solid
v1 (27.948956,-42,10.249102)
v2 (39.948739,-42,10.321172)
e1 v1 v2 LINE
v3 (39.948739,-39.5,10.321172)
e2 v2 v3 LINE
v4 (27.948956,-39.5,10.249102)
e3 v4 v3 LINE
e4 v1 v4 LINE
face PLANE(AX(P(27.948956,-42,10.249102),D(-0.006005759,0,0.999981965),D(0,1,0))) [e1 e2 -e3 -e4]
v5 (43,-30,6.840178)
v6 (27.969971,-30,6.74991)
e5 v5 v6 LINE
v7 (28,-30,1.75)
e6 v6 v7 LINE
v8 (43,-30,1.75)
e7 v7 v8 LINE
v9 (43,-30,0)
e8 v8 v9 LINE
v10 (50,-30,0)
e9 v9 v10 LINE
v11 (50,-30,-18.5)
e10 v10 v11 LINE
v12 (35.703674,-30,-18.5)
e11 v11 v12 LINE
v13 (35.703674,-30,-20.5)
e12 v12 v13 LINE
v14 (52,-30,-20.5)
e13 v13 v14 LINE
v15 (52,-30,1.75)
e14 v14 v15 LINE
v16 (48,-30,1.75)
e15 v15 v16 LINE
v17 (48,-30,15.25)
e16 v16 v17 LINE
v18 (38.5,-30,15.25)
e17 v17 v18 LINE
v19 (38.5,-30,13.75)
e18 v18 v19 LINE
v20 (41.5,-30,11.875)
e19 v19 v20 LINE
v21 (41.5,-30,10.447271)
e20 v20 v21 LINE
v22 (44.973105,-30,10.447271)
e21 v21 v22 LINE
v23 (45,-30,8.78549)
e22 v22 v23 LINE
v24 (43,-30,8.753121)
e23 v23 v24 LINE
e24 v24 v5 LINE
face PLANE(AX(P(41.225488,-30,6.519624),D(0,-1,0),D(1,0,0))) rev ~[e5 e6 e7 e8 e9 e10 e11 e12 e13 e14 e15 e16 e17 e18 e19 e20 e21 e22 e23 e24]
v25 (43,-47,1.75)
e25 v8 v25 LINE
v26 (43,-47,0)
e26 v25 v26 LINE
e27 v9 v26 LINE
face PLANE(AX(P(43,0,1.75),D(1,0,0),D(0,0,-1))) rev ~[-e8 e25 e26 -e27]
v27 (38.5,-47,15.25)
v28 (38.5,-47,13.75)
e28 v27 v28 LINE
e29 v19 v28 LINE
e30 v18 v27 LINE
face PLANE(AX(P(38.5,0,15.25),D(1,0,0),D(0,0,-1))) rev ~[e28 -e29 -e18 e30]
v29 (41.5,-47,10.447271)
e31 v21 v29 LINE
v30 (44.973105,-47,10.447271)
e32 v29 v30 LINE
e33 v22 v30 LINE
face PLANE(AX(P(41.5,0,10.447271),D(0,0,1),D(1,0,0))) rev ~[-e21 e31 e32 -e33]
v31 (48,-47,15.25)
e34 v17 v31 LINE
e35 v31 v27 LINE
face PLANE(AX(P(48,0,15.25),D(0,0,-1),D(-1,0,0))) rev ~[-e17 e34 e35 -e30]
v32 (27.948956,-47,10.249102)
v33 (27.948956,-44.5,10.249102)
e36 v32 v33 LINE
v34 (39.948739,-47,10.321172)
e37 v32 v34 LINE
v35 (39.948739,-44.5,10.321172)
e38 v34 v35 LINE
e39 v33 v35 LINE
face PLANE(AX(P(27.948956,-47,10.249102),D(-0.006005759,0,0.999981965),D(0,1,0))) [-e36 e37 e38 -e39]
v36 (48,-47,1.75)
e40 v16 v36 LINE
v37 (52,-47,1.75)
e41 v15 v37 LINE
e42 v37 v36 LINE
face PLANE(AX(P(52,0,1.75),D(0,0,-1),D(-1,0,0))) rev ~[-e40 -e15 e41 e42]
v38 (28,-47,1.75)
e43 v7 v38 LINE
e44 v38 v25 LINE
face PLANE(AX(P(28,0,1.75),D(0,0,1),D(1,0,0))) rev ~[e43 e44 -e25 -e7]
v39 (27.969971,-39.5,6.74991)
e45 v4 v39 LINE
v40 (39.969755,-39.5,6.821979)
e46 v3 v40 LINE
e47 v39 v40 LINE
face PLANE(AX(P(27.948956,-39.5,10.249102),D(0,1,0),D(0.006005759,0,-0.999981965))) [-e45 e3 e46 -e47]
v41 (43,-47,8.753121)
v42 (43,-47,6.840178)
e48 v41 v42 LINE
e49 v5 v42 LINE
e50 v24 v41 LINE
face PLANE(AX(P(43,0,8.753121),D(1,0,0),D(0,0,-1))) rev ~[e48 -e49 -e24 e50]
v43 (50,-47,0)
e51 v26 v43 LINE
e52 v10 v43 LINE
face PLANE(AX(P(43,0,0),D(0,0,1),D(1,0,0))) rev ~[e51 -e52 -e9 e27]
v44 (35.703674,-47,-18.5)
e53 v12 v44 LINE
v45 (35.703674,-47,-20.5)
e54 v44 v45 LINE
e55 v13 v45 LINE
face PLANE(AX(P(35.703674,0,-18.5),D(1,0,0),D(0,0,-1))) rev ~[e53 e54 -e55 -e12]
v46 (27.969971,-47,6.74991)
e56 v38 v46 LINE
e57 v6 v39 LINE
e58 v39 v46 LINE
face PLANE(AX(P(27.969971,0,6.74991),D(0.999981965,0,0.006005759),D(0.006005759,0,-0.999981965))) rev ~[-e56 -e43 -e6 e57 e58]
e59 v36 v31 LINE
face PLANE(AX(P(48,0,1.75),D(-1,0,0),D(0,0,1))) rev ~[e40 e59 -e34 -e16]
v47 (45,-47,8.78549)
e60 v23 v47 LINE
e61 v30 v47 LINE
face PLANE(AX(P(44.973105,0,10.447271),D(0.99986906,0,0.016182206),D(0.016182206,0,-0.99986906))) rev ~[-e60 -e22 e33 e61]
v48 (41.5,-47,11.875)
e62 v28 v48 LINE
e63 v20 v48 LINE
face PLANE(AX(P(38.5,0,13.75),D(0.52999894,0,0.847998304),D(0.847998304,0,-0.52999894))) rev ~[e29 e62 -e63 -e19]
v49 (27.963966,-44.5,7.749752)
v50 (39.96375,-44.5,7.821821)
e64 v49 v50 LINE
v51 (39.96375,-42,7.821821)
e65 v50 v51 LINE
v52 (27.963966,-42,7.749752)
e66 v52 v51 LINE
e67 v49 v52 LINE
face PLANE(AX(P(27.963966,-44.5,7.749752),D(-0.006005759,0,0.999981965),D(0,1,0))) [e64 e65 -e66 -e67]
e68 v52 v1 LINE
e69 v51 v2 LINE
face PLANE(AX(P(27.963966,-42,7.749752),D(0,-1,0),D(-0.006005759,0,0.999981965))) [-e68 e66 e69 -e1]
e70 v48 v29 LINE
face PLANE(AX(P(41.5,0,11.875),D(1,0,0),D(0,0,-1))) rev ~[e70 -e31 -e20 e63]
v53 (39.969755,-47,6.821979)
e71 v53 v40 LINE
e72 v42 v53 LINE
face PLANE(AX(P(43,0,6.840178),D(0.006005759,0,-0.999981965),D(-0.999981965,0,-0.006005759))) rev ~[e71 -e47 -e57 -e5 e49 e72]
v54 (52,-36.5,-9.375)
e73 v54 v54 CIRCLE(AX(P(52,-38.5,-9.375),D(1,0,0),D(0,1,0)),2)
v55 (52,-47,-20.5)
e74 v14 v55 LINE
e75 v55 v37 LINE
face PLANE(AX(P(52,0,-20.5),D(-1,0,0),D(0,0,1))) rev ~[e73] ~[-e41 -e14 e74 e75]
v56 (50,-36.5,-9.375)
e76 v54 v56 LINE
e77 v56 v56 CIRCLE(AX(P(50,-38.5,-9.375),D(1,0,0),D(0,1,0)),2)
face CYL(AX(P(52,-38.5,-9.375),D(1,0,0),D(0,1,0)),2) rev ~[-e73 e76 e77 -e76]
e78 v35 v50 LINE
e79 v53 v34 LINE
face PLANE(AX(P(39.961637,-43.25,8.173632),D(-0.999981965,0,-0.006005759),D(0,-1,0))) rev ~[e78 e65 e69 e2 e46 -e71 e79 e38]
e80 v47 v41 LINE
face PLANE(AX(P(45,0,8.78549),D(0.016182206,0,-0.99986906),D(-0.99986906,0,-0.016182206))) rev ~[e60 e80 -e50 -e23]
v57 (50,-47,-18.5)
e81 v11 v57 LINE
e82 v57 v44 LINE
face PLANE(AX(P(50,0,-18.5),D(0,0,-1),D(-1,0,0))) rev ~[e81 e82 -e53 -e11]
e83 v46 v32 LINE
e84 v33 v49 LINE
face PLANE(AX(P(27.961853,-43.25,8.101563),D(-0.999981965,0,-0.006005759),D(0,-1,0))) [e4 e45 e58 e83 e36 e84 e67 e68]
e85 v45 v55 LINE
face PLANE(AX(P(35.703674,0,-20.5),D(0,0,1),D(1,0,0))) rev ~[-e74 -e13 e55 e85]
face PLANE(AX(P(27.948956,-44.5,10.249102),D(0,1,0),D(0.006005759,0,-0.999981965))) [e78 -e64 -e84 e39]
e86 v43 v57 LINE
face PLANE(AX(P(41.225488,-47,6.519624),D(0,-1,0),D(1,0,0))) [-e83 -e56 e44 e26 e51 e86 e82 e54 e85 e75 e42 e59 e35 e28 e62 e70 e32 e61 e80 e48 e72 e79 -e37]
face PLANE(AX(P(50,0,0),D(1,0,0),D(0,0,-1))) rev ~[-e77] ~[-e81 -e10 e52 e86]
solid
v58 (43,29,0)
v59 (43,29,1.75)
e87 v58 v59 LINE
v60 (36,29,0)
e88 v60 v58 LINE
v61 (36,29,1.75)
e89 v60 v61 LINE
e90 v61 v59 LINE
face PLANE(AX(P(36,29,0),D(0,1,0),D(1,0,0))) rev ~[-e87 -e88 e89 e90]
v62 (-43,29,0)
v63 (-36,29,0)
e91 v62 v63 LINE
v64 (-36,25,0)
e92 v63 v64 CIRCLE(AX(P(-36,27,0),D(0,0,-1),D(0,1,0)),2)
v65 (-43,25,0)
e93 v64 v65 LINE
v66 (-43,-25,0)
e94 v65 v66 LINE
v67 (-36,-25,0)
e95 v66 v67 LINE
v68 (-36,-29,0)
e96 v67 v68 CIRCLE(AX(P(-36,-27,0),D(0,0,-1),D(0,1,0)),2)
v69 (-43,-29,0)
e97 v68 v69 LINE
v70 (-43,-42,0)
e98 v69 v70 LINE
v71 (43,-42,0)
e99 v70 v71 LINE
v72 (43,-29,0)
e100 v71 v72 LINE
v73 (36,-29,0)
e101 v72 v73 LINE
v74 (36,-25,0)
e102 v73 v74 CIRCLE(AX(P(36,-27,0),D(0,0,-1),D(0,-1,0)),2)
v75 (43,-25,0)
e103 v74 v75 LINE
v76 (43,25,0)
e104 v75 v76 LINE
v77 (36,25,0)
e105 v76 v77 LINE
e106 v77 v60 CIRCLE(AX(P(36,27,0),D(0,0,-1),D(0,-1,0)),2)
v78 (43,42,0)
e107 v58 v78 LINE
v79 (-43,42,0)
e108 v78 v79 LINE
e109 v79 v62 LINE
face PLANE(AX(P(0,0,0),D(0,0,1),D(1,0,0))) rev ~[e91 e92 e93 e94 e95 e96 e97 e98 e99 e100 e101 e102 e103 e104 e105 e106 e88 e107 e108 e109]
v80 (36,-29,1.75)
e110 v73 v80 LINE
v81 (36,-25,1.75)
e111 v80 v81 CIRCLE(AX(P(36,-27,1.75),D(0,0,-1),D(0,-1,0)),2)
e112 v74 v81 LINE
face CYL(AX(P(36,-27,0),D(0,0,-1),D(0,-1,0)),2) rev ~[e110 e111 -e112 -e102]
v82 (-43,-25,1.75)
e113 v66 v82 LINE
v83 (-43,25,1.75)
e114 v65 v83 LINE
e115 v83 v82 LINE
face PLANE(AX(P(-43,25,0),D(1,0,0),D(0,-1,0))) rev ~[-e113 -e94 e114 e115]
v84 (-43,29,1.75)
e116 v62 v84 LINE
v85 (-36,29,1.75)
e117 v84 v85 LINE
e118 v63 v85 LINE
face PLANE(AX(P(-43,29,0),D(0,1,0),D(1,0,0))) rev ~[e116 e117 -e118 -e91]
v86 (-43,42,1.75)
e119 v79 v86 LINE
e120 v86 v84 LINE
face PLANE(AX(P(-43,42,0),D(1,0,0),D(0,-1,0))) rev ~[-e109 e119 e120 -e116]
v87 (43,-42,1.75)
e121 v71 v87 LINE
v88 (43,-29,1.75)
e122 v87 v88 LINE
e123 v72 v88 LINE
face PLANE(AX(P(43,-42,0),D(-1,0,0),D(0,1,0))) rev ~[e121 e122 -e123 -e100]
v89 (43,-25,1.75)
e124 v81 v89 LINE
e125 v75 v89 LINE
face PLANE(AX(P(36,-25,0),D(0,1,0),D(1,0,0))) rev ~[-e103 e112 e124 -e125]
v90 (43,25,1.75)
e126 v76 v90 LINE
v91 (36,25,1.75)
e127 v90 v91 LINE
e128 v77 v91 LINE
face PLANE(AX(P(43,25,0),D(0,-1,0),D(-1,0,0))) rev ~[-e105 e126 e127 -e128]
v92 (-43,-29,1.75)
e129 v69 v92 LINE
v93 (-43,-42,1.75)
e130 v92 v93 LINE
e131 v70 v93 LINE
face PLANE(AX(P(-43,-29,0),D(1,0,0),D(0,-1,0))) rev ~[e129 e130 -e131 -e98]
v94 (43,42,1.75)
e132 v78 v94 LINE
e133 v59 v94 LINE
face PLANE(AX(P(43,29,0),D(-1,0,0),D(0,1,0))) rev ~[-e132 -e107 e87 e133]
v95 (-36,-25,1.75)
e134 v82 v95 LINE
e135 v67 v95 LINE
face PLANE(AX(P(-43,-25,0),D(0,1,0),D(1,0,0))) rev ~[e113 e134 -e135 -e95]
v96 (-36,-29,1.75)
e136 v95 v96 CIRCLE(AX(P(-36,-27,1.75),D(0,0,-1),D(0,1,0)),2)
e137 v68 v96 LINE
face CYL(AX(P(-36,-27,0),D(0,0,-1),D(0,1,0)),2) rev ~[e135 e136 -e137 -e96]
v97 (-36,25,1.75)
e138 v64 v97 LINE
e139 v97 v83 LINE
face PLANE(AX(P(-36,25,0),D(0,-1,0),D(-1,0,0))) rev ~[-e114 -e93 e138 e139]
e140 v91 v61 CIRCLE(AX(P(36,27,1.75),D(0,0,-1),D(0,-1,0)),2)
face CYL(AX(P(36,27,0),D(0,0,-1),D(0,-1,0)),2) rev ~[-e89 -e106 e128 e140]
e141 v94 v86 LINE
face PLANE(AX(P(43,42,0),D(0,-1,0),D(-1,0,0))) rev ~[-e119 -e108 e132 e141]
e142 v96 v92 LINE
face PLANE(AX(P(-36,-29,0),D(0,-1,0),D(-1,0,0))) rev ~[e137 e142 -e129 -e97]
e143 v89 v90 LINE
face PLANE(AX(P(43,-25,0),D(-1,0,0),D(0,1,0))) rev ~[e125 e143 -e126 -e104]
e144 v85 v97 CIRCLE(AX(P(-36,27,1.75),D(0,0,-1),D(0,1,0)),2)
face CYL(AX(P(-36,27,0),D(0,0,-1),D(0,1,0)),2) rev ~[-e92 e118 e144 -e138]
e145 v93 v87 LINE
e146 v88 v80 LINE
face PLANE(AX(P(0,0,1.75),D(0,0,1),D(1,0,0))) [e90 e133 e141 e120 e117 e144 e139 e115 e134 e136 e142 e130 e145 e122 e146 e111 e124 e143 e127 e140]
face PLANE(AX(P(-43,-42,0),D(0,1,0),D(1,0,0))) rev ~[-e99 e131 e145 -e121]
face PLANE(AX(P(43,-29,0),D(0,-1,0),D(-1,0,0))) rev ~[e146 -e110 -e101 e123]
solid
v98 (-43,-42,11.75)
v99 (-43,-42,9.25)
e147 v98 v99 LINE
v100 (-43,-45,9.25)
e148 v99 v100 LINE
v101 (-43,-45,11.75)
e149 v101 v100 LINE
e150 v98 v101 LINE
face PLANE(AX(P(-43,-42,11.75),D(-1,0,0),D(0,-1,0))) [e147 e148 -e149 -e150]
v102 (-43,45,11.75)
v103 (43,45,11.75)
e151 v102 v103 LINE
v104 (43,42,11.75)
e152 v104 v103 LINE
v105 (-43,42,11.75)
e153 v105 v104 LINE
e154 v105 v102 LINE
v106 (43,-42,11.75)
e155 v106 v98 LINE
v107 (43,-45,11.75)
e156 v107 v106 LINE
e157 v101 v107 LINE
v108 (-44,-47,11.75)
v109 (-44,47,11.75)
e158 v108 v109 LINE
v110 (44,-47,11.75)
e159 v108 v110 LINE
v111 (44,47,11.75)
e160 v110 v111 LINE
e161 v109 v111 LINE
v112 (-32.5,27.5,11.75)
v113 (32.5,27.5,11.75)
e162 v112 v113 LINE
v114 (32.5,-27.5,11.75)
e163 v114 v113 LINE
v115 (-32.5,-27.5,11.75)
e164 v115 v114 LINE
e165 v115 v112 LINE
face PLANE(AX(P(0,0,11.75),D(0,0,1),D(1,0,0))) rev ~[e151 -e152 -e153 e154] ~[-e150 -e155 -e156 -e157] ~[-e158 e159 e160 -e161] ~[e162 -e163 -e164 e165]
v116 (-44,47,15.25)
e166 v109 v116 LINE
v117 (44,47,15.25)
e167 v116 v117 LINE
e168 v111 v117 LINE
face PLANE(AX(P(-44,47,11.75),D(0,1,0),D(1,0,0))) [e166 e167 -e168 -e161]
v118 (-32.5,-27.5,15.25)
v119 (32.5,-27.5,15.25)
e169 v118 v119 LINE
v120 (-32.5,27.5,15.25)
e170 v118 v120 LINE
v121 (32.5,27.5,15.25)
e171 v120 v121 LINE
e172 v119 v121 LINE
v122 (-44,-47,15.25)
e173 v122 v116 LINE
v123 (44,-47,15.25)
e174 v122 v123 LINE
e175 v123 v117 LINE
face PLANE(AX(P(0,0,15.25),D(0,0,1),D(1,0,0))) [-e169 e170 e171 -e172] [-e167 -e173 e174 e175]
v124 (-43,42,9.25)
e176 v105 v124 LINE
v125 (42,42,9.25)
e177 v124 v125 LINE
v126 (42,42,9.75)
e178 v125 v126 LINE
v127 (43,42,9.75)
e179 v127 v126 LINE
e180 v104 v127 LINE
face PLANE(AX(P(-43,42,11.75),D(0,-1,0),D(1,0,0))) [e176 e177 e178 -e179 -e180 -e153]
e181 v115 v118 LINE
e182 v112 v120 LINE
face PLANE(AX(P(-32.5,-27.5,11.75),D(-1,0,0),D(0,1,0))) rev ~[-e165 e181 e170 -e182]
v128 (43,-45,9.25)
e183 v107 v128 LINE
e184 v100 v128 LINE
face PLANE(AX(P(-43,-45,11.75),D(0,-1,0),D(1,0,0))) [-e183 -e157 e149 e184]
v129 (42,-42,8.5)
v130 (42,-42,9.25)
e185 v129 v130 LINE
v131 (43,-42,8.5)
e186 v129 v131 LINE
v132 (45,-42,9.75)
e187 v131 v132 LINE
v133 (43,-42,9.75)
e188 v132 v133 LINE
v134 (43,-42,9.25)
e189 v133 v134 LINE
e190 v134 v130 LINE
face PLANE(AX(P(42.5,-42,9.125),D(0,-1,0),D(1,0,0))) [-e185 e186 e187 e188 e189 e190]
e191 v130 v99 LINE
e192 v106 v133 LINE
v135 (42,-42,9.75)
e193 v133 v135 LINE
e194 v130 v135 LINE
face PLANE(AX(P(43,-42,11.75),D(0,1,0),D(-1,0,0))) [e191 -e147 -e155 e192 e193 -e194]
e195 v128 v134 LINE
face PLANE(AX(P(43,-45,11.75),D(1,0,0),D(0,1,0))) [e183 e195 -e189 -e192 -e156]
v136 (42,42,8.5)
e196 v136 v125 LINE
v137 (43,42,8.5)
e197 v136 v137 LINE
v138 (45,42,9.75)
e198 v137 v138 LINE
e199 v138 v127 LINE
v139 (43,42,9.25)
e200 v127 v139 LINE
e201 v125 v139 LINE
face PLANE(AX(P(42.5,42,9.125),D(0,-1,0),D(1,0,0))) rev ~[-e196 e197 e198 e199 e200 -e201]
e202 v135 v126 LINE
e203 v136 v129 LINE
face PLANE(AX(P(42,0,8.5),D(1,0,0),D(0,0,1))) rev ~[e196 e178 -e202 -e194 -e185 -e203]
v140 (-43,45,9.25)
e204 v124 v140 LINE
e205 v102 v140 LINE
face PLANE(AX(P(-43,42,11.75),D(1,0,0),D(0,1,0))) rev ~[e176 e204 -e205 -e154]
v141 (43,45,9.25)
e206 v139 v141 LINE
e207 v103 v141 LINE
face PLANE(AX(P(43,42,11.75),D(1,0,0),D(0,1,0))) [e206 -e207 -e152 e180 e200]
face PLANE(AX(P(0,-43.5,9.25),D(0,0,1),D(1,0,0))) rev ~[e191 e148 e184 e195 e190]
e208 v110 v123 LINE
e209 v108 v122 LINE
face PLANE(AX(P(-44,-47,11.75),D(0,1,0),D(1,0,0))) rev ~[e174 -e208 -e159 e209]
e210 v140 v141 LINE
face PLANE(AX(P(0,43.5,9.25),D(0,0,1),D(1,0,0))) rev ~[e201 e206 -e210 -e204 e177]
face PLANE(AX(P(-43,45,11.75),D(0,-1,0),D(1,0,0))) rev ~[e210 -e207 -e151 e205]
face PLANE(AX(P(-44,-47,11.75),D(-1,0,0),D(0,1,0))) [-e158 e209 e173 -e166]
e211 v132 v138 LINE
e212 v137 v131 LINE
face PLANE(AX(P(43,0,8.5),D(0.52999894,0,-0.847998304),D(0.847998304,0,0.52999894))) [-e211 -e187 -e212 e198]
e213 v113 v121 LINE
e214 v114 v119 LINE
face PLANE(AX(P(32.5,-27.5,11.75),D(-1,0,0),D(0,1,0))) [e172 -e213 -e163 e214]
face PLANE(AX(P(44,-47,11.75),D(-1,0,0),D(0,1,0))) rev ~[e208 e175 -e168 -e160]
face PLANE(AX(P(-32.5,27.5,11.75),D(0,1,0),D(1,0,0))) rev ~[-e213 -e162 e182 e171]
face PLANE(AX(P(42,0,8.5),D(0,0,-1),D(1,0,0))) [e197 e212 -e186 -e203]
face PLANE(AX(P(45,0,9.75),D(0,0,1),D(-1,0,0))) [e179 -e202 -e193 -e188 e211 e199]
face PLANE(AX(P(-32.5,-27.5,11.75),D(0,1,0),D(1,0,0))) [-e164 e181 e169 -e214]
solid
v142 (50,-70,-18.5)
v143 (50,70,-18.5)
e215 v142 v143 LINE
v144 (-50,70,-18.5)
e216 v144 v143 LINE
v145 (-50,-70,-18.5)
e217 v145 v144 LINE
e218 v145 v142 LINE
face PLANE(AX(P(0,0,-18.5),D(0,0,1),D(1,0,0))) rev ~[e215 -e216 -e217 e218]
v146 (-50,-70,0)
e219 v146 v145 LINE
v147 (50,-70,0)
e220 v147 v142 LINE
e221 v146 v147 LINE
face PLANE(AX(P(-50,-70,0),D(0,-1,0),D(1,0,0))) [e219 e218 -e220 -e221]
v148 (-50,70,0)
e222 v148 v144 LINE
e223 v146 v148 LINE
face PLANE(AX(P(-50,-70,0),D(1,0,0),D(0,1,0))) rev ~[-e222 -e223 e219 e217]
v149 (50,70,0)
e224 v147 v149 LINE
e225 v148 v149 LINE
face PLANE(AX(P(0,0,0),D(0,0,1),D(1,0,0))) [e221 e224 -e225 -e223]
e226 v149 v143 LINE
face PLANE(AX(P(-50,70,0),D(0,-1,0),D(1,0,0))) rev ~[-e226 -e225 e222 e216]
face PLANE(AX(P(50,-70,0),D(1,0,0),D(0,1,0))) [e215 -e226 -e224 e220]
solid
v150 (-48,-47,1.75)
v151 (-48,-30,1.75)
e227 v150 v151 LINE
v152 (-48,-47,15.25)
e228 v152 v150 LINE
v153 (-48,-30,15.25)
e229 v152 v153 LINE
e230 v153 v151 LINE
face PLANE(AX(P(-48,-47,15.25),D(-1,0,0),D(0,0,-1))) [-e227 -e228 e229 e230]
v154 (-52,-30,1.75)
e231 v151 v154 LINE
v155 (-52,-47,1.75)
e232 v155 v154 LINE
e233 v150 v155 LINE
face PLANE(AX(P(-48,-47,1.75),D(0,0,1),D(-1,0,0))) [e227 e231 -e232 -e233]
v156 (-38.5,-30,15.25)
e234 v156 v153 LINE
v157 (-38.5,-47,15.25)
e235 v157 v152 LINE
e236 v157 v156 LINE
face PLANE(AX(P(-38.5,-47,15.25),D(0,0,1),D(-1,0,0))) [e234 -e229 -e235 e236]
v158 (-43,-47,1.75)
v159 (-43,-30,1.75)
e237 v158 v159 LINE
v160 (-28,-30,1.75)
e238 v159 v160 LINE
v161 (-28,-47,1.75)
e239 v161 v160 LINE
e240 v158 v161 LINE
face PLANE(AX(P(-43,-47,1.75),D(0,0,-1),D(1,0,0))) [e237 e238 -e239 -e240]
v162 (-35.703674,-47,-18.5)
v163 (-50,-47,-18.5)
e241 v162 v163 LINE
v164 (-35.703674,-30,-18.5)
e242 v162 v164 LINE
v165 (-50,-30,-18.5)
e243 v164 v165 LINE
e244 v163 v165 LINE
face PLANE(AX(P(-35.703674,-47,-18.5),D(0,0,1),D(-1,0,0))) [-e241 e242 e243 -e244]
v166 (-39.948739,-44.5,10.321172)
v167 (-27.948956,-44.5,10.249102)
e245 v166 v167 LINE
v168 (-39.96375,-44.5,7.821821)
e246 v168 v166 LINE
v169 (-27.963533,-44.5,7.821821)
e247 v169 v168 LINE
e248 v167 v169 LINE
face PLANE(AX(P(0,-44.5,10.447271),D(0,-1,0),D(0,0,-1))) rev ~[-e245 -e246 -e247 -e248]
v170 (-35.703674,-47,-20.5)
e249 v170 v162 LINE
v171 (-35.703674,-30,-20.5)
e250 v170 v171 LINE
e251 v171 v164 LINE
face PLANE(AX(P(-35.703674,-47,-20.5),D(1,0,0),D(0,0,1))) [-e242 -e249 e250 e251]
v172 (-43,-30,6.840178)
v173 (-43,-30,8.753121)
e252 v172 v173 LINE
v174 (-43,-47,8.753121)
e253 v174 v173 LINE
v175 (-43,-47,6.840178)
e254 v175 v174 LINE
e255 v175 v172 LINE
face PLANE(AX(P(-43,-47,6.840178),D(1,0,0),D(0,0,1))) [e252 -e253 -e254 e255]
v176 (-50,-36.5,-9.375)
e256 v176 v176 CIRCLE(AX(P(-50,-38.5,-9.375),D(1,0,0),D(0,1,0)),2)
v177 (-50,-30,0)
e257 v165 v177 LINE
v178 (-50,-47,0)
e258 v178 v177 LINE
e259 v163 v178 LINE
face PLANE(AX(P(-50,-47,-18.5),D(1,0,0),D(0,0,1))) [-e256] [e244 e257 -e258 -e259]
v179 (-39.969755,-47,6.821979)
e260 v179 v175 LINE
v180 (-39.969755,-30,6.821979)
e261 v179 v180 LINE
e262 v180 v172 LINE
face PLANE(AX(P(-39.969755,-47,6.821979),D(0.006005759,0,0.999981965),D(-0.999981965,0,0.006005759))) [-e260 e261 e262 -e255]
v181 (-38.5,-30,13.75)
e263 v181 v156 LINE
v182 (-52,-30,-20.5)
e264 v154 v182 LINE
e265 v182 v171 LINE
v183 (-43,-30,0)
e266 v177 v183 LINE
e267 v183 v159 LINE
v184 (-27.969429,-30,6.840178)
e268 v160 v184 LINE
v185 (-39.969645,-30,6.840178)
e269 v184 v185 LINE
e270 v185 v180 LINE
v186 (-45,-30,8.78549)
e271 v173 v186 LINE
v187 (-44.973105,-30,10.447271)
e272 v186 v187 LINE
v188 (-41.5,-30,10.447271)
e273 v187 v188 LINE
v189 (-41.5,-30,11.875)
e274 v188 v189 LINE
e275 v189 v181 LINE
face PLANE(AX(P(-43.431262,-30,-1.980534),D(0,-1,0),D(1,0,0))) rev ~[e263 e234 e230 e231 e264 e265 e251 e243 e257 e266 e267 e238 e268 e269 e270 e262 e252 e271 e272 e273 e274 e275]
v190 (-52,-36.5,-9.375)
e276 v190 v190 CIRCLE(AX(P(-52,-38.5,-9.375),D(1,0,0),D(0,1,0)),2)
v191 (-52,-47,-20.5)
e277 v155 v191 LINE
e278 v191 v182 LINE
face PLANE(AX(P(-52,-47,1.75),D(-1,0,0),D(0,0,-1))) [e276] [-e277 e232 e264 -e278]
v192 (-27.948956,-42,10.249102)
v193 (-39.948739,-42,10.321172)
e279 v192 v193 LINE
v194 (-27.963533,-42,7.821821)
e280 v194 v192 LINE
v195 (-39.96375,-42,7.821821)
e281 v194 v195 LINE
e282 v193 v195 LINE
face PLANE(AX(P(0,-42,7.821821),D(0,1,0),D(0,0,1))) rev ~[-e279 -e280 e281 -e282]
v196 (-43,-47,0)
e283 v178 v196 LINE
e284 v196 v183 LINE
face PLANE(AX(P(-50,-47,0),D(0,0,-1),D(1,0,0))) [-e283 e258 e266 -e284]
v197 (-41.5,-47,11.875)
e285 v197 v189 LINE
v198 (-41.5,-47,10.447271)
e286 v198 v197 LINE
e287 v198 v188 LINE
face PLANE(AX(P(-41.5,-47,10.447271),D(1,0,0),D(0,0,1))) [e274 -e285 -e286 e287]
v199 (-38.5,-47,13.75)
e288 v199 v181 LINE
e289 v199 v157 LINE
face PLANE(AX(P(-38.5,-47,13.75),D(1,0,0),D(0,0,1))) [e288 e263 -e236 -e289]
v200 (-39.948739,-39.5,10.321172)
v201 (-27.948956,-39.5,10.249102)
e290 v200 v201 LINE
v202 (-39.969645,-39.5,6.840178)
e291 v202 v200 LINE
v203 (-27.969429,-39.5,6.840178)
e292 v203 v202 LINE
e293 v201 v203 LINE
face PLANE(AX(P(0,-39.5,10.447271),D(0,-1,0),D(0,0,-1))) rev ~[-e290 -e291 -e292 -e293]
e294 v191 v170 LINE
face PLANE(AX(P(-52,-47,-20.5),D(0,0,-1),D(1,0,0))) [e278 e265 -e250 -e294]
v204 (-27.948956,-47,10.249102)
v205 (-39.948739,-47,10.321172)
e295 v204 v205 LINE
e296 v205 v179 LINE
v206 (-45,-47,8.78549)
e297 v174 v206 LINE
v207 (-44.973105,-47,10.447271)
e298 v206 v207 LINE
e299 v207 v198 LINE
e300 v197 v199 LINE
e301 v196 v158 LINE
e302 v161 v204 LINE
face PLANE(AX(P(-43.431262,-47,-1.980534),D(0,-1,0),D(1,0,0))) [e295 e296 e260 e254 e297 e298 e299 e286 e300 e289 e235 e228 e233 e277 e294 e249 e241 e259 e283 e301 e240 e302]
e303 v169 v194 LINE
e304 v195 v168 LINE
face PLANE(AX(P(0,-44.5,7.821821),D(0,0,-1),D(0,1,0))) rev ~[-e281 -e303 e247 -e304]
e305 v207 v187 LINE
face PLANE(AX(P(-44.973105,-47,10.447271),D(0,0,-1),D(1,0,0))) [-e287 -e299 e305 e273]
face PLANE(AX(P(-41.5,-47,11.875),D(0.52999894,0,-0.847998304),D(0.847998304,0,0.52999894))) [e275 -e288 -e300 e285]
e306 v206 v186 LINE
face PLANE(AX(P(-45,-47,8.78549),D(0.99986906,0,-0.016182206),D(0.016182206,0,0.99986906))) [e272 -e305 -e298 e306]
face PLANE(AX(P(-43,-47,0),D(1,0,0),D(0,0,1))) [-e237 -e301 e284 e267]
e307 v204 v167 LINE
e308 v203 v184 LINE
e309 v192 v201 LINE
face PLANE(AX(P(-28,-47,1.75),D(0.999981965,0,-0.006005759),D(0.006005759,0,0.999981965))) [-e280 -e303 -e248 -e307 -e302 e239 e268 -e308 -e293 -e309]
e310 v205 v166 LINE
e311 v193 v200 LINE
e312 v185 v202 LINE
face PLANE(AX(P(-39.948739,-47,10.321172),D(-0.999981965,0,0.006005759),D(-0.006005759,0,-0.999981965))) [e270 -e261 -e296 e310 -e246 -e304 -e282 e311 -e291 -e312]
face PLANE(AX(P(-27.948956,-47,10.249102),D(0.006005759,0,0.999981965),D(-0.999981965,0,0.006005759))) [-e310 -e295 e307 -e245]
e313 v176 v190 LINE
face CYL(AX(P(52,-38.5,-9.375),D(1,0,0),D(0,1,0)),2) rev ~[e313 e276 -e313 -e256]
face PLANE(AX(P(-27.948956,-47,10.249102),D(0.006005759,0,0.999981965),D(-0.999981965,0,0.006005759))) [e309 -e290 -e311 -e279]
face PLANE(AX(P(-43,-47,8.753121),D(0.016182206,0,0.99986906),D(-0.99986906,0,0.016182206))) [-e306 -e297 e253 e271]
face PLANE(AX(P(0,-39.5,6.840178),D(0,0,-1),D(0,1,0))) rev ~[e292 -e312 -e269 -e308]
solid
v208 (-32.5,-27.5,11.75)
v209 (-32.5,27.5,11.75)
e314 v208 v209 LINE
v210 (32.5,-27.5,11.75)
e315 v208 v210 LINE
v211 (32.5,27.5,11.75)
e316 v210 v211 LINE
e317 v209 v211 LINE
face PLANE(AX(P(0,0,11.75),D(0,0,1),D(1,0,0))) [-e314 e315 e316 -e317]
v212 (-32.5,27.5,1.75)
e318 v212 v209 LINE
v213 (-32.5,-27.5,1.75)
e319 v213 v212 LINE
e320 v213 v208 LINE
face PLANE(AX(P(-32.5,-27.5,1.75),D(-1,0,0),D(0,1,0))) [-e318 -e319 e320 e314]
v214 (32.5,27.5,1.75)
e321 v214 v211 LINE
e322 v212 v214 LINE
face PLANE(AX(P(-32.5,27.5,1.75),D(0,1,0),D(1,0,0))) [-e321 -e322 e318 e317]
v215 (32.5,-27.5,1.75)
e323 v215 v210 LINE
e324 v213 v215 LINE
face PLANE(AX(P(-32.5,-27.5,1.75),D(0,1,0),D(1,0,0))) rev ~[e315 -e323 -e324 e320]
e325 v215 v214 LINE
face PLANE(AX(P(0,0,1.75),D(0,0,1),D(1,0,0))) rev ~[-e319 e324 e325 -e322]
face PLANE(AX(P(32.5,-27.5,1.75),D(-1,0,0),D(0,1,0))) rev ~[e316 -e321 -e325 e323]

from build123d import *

# Parameters (mm, degrees)
F0_W           = 100
F0_H           = 140
F1_DEPTH       = 18.5
F3_DEPTH       = 1.75
F4_W           = 65
F4_H           = 55
F5_DEPTH       = 10
F6_W           = 88
F6_H           = 94
F6_W_2         = 86
F6_H_2         = 84
F6_W_3         = 65
F6_H_3         = 55
F6_H_4         = 3
F7_DEPTH       = 3.5
F8_DEPTH       = 2.5
F9_W           = 1
F9_H           = 1.25
F10_DEPTH      = 42
F10_DEPTH_BACK = 42
F12_DEPTH      = 47
F13_DEPTH      = 30
F15_DEPTH      = 12
F17_DEPTH      = 17
F19_DEPTH      = 40
F20_R          = 2
F21_DEPTH      = 120


with BuildPart() as f1:
    # F0 (on Top) → F1 (new body)
    with BuildSketch(Plane.XY):
        Rectangle(F0_W, F0_H)
    extrude(amount=-F1_DEPTH)


with BuildPart() as f3:
    # F2 (on Top) → F3 (new body)
    with BuildSketch(Plane.XY):
        with BuildLine():
            Line((43, 42), (-43, 42))
            Line((-43, 42), (-43, 29))
            Line((-43, 29), (-36, 29))
            ThreePointArc((-36, 29), (-34, 27), (-36, 25))
            Line((-36, 25), (-43, 25))
            Line((-43, 25), (-43, -25))
            Line((-43, -25), (-36, -25))
            ThreePointArc((-36, -25), (-34, -27), (-36, -29))
            Line((-36, -29), (-43, -29))
            Line((-43, -29), (-43, -42))
            Line((-43, -42), (43, -42))
            Line((43, -42), (43, -29))
            Line((43, -29), (36, -29))
            ThreePointArc((36, -29), (34, -27), (36, -25))
            Line((36, -25), (43, -25))
            Line((43, -25), (43, 25))
            Line((43, 25), (36, 25))
            ThreePointArc((36, 25), (34, 27), (36, 29))
            Line((36, 29), (43, 29))
            Line((43, 29), (43, 42))
        make_face()
    extrude(amount=F3_DEPTH)


with BuildPart() as f5:
    # F4 (on face) → F5 (new body)
    with BuildSketch(Plane.XY.offset(1.75)):
        Rectangle(F4_W, F4_H)
    extrude(amount=F5_DEPTH)


with BuildPart() as f7:
    # F6 (on face) → F7 (new body)
    with BuildSketch(Plane.XY.offset(11.75)):
        Rectangle(F6_W, F6_H)
        Polygon((-43, 42), (-43, 45), (43, 45), (43, 42), (43, -42), (43, -44), (43, -45), (-43, -45), (-43, -44), (-43, -42), align=None, mode=Mode.SUBTRACT)
        Rectangle(F6_W_2, F6_H_2)
        Rectangle(F6_W_3, F6_H_3, mode=Mode.SUBTRACT)
        with Locations((0, 43.5)):
            Rectangle(F6_W_2, F6_H_4)
        Polygon((43, -42), (-43, -42), (-43, -44), (-43, -45), (43, -45), (43, -44), align=None)
    extrude(amount=F7_DEPTH)

    # F6 (on face) → F8 (join)
    with BuildSketch(Plane.XY.offset(11.75)):
        with Locations((0, 43.5)):
            Rectangle(F6_W_2, F6_H_4)
        Polygon((43, -42), (-43, -42), (-43, -44), (-43, -45), (43, -45), (43, -44), align=None)
    extrude(amount=-F8_DEPTH)

    # F9 (on Front) → F10 (join, two sides)
    with BuildSketch(Plane.XZ) as f10_sk:
        with Locations((42.5, 9.125)):
            Rectangle(F9_W, F9_H)
        Polygon((43, 9.75), (43, 8.5), (45, 9.75), align=None)
    extrude(amount=F10_DEPTH)
    extrude(f10_sk.sketch, amount=-F10_DEPTH_BACK)


with BuildPart() as f12:
    # F11 (on Front) → F12 (new body)
    with BuildSketch(Plane.XZ):
        Polygon((27.9699712028, 6.7499098263), (28, 1.75), (43, 1.75), (43, 0), (48, 0), (50, 0), (52, 0), (52, 1.75), (48, 1.75), (48, 13.75), (48, 15.25), (38.5, 15.25), (38.5, 13.75), (41.5, 11.875), (41.5, 10.4472711682), (44.9731051922, 10.4472711682), (45, 8.7854899466), (43, 8.7531212961), (43, 6.8401781918), align=None)
        Polygon((52, 0), (50, 0), (50, -18.5), (35.7036739588, -18.5), (35.7036739588, -20.5), (52, -20.5), align=None)
    extrude(amount=F12_DEPTH)

    # F11 (on Front) → F13 (cut)
    with BuildSketch(Plane.XZ):
        Polygon((27.9699712028, 6.7499098263), (28, 1.75), (43, 1.75), (43, 0), (48, 0), (50, 0), (52, 0), (52, 1.75), (48, 1.75), (48, 13.75), (48, 15.25), (38.5, 15.25), (38.5, 13.75), (41.5, 11.875), (41.5, 10.4472711682), (44.9731051922, 10.4472711682), (45, 8.7854899466), (43, 8.7531212961), (43, 6.8401781918), align=None)
        Polygon((52, 0), (50, 0), (50, -18.5), (35.7036739588, -18.5), (35.7036739588, -20.5), (52, -20.5), align=None)
    extrude(amount=F13_DEPTH, mode=Mode.SUBTRACT)

    # F14 (on face) → F15 (join)
    with BuildSketch(Plane(origin=(28.0094999534, 0, 0.1682213529), x_dir=(0, -1, 0), z_dir=(-0.9999819653, 0, -0.0060057594))):
        Polygon((39.5, 5.9370710514), (47, 5.9370710514), (47, 7.0816674463), (47, 10.0810629427), (44.5, 10.0810629427), (44.5, 7.5816674463), (42, 7.5816674463), (42, 9.5810629427), (42, 10.0810629427), (39.5, 10.0810629427), (39.5, 9.5810629427), align=None)
    extrude(amount=-F15_DEPTH)


with BuildPart() as f17:
    # F16 (on face) → F17 (new body)
    with BuildSketch(Plane.XZ.offset(47)):
        Polygon((-35.7036739588, -20.5), (-35.7036739588, -18.5), (-50, -18.5), (-50, 0), (-43, 0), (-43, 1.75), (-28, 1.75), (-27.9489555144, 10.2491024863), (-39.9487390975, 10.3211715997), (-39.9697547859, 6.8219789397), (-43, 6.8401781918), (-43, 8.7531212961), (-45, 8.7854899466), (-44.9731051922, 10.4472711682), (-41.5, 10.4472711682), (-41.5, 11.875), (-38.5, 13.75), (-38.5, 15.25), (-48, 15.25), (-48, 1.75), (-52, 1.75), (-52, -20.5), align=None)
    extrude(amount=-F17_DEPTH)

    # F18 (on Right) → F19 (cut)
    with BuildSketch(Plane.YZ):
        Polygon((-39.5, 10.4472711682), (-39.5, 10.2491024863), (-39.5, 6.8401781918), (-30, 6.8401781918), (-30, 10.2491024863), (-30, 10.4472711682), align=None)
        Polygon((-44.5, 10.4472711682), (-44.5, 10.2491024863), (-44.5, 7.8218211792), (-42, 7.8218211792), (-42, 10.2491024863), (-42, 10.4472711682), align=None)
    extrude(amount=-F19_DEPTH, mode=Mode.SUBTRACT)


with BuildPart() as f21_tool:
    # F20 (on face) → F21 (new body)
    with BuildSketch(Plane.YZ.offset(52)):
        with Locations((-38.5, -9.375)):
            Circle(F20_R)
    extrude(amount=-F21_DEPTH)


with BuildPart() as f12_1:
    add(f12.part)

    # F21: cut by f21_tool
    add(f21_tool.part, mode=Mode.SUBTRACT)


with BuildPart() as f17_1:
    add(f17.part)

    # F21: cut by f21_tool
    add(f21_tool.part, mode=Mode.SUBTRACT)


solid = Compound([f1.part, f3.part, f5.part, f7.part, f12_1.part, f17_1.part])
